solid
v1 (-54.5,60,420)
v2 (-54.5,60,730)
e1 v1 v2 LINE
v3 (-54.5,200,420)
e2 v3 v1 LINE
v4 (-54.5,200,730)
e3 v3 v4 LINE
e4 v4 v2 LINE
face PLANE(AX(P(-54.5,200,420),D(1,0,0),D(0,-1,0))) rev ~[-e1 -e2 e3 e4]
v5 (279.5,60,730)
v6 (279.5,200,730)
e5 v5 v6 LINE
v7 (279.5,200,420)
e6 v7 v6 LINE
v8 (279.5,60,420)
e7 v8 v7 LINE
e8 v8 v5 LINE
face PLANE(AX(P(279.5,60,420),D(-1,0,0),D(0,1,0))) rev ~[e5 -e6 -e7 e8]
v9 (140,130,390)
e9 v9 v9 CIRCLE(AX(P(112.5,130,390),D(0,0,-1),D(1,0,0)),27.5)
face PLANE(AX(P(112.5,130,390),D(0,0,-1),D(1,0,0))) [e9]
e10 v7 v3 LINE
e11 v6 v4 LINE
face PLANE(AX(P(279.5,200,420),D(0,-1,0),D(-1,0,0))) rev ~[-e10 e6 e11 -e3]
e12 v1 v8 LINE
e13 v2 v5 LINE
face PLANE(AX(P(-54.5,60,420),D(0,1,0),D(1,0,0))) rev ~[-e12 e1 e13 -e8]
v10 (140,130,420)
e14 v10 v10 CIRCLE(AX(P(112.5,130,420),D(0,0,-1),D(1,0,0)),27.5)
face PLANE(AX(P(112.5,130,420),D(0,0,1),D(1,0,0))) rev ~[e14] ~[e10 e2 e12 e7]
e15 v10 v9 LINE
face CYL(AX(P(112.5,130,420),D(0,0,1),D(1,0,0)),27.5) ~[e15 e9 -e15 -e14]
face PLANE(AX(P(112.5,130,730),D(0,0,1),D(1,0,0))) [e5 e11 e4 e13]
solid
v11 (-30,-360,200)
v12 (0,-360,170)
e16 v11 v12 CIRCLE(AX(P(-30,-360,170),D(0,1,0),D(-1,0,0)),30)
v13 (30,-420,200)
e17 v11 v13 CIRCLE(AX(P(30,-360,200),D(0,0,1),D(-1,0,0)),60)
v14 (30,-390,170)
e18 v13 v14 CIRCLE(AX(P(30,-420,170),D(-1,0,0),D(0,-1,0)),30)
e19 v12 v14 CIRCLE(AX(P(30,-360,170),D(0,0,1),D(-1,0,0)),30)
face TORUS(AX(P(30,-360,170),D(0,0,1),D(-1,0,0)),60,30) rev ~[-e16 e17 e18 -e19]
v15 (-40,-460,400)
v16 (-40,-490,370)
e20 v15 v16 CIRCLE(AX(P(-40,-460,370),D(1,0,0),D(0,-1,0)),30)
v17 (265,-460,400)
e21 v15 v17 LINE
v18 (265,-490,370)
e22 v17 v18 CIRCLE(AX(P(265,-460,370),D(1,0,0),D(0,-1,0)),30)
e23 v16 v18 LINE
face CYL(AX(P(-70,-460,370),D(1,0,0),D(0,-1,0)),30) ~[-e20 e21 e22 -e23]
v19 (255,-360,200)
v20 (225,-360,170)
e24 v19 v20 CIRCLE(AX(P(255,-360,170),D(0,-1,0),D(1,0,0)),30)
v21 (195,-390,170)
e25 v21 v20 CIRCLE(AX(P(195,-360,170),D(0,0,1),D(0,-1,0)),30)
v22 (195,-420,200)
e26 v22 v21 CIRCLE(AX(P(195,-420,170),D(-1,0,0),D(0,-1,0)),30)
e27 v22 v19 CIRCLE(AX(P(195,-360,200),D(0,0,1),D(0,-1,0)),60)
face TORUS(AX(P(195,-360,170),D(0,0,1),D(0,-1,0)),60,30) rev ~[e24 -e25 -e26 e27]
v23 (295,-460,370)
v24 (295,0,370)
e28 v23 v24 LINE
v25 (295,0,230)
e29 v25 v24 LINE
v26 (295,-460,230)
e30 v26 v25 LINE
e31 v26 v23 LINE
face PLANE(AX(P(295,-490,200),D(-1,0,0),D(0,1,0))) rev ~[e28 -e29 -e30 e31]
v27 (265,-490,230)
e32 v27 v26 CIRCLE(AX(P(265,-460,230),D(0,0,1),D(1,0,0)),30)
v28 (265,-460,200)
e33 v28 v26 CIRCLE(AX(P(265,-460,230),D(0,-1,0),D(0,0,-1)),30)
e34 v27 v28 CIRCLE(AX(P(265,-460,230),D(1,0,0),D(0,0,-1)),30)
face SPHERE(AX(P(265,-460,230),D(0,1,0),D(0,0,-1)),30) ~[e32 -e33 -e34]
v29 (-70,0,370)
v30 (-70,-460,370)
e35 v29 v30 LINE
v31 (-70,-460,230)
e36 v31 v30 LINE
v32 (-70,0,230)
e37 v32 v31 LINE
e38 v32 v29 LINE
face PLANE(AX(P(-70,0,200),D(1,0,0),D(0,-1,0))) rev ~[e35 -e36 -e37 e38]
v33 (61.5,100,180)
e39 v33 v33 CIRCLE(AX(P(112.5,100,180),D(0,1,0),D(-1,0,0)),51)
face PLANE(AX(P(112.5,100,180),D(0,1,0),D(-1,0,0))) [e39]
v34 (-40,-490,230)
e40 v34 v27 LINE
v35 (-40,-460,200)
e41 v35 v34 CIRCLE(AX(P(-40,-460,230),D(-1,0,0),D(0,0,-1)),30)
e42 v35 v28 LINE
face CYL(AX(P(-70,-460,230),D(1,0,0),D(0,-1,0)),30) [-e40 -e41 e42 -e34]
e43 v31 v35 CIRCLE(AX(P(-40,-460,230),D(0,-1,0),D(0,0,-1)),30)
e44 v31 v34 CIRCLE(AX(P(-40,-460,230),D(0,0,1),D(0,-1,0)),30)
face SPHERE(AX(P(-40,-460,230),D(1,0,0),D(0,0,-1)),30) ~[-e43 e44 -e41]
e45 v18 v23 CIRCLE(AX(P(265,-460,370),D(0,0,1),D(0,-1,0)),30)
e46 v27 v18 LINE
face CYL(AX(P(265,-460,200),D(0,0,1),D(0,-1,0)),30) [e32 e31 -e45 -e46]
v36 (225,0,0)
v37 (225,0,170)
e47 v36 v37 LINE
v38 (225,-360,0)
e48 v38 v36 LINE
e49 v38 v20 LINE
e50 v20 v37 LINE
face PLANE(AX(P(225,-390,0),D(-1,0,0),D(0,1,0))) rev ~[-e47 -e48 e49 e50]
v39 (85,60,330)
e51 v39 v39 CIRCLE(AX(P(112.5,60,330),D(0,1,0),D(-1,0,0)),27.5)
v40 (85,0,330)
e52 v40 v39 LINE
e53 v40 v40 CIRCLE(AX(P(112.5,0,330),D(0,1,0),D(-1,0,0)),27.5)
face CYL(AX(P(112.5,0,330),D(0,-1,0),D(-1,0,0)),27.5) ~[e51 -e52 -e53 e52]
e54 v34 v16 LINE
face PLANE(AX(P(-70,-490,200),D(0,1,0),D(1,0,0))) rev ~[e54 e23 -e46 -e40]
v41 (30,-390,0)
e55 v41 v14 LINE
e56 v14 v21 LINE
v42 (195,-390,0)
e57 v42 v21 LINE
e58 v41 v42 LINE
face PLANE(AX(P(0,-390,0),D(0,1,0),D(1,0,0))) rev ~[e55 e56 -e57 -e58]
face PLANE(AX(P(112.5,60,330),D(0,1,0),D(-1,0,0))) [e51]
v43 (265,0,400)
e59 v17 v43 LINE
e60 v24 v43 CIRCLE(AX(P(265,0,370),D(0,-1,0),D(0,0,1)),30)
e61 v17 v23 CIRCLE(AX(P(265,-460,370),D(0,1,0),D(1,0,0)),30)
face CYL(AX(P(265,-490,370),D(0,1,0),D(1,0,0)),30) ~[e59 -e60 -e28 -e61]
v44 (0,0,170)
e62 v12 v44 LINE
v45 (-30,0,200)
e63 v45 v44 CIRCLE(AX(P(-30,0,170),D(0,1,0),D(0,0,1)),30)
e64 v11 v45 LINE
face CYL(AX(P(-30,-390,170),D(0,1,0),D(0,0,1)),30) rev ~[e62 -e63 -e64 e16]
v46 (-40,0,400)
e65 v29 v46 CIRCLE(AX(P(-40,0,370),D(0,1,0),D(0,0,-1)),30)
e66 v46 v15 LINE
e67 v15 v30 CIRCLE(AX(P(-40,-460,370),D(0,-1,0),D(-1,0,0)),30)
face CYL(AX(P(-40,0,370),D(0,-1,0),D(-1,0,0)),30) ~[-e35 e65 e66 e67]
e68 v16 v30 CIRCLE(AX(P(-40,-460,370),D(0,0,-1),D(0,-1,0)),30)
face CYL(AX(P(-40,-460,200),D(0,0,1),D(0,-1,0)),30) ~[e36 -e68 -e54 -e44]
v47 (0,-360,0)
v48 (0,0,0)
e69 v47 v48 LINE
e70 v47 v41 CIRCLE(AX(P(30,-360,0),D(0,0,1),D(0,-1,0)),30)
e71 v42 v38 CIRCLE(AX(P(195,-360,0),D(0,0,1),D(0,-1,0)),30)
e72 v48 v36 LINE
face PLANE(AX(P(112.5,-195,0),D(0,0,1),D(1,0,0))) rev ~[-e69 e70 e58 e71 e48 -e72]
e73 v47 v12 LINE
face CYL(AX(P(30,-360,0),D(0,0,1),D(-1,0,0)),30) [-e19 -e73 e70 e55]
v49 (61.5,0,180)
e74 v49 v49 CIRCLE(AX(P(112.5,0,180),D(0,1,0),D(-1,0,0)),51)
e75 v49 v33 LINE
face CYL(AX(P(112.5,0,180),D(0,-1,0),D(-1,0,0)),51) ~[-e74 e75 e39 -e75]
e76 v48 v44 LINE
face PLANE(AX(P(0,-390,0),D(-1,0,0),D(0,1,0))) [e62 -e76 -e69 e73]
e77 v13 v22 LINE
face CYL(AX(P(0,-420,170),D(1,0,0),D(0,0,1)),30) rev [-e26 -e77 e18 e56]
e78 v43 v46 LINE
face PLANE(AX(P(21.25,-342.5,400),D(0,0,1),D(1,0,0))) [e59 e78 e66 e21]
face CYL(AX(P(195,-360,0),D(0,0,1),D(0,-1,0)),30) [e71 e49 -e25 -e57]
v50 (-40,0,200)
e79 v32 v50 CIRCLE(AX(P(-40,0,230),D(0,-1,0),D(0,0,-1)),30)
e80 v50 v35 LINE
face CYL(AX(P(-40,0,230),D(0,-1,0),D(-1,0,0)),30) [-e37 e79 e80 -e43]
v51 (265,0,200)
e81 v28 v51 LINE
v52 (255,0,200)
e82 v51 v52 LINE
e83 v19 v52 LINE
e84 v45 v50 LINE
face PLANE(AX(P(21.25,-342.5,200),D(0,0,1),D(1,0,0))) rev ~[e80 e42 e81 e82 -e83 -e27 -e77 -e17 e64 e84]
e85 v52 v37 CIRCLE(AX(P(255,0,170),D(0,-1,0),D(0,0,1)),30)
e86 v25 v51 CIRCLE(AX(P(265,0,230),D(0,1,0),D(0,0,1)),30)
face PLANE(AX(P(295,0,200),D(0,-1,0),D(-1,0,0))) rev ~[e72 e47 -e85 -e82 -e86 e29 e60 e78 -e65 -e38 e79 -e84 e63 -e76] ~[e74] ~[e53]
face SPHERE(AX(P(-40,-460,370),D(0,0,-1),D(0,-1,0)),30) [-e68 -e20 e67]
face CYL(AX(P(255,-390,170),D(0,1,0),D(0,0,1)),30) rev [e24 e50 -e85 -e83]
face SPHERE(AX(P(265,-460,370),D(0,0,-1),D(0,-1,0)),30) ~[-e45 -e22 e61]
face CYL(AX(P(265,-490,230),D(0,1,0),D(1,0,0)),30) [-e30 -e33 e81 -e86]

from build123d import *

# Parameters (mm, degrees)
F0_W      = 225
F0_H      = 390
F1_DEPTH  = 200
F2_W      = 182.5
F2_H      = 295
F2_H_2    = 195
F3_DEPTH  = 200
F4_R      = 30
F5_R      = 51
F6_DEPTH  = 100
F5_R_2    = 27.5
F7_DEPTH  = 60
F10_DEPTH = 310
F11_R     = 27.5
F12_DEPTH = 30


with BuildPart() as f1:
    # F0 (on Top) → F1 (new body)
    with BuildSketch(Plane.XY):
        with Locations((112.5, -195)):
            Rectangle(F0_W, F0_H)
    extrude(amount=F1_DEPTH)

    # F2 (on face) → F3 (join)
    with BuildSketch(Plane.XY.offset(200)):
        with Locations((21.25, -342.5)):
            Rectangle(F2_W, F2_H)
        with Locations((21.25, -97.5)):
            Rectangle(F2_W, F2_H_2)
        Polygon((112.5, 0), (112.5, -195), (112.5, -490), (295, -490), (295, 0), align=None)
    extrude(amount=F3_DEPTH)

    # F4
    f4_edges = [f1.edges().sort_by_distance(p)[0] for p in [
        (225, -390, 100),
        (112.5, -390, 200),
        (0, -390, 100),
        (295, -245, 200),
        (112.5, -490, 200),
        (-70, -245, 200),
        (-70, -490, 300),
        (295, -490, 300),
        (112.5, -490, 400),
        (-70, -245, 400),
        (295, -245, 400),
        (0, -195, 200),
        (225, -195, 200),
    ]]
    fillet(f4_edges, radius=F4_R)

    # F5 (on face) → F6 (join)
    with BuildSketch(Plane(origin=(0, 0, 0), x_dir=(-1, 0, 0), z_dir=(0, 1, 0))):
        with Locations((-112.5, 180)):
            Circle(F5_R)
    extrude(amount=F6_DEPTH)

    # F5 (on face) → F7 (join)
    with BuildSketch(Plane(origin=(0, 0, 0), x_dir=(-1, 0, 0), z_dir=(0, 1, 0))):
        with Locations((-112.5, 330)):
            Circle(F5_R_2)
    extrude(amount=F7_DEPTH)


with BuildPart() as f10:
    # F9 (on offset) → F10 (new body)
    with BuildSketch(Plane.XY.offset(420)):
        Polygon((-54.5, 60), (112.5, 60), (279.5, 60), (279.5, 200), (-54.5, 200), align=None)
    extrude(amount=F10_DEPTH)

    # F11 (on face) → F12 (join)
    with BuildSketch(Plane(origin=(0, 0, 420), x_dir=(1, 0, 0), z_dir=(0, 0, -1))):
        with Locations((112.5, -130)):
            Circle(F11_R)
    extrude(amount=F12_DEPTH)


solid = Compound([f1.part, f10.part])
